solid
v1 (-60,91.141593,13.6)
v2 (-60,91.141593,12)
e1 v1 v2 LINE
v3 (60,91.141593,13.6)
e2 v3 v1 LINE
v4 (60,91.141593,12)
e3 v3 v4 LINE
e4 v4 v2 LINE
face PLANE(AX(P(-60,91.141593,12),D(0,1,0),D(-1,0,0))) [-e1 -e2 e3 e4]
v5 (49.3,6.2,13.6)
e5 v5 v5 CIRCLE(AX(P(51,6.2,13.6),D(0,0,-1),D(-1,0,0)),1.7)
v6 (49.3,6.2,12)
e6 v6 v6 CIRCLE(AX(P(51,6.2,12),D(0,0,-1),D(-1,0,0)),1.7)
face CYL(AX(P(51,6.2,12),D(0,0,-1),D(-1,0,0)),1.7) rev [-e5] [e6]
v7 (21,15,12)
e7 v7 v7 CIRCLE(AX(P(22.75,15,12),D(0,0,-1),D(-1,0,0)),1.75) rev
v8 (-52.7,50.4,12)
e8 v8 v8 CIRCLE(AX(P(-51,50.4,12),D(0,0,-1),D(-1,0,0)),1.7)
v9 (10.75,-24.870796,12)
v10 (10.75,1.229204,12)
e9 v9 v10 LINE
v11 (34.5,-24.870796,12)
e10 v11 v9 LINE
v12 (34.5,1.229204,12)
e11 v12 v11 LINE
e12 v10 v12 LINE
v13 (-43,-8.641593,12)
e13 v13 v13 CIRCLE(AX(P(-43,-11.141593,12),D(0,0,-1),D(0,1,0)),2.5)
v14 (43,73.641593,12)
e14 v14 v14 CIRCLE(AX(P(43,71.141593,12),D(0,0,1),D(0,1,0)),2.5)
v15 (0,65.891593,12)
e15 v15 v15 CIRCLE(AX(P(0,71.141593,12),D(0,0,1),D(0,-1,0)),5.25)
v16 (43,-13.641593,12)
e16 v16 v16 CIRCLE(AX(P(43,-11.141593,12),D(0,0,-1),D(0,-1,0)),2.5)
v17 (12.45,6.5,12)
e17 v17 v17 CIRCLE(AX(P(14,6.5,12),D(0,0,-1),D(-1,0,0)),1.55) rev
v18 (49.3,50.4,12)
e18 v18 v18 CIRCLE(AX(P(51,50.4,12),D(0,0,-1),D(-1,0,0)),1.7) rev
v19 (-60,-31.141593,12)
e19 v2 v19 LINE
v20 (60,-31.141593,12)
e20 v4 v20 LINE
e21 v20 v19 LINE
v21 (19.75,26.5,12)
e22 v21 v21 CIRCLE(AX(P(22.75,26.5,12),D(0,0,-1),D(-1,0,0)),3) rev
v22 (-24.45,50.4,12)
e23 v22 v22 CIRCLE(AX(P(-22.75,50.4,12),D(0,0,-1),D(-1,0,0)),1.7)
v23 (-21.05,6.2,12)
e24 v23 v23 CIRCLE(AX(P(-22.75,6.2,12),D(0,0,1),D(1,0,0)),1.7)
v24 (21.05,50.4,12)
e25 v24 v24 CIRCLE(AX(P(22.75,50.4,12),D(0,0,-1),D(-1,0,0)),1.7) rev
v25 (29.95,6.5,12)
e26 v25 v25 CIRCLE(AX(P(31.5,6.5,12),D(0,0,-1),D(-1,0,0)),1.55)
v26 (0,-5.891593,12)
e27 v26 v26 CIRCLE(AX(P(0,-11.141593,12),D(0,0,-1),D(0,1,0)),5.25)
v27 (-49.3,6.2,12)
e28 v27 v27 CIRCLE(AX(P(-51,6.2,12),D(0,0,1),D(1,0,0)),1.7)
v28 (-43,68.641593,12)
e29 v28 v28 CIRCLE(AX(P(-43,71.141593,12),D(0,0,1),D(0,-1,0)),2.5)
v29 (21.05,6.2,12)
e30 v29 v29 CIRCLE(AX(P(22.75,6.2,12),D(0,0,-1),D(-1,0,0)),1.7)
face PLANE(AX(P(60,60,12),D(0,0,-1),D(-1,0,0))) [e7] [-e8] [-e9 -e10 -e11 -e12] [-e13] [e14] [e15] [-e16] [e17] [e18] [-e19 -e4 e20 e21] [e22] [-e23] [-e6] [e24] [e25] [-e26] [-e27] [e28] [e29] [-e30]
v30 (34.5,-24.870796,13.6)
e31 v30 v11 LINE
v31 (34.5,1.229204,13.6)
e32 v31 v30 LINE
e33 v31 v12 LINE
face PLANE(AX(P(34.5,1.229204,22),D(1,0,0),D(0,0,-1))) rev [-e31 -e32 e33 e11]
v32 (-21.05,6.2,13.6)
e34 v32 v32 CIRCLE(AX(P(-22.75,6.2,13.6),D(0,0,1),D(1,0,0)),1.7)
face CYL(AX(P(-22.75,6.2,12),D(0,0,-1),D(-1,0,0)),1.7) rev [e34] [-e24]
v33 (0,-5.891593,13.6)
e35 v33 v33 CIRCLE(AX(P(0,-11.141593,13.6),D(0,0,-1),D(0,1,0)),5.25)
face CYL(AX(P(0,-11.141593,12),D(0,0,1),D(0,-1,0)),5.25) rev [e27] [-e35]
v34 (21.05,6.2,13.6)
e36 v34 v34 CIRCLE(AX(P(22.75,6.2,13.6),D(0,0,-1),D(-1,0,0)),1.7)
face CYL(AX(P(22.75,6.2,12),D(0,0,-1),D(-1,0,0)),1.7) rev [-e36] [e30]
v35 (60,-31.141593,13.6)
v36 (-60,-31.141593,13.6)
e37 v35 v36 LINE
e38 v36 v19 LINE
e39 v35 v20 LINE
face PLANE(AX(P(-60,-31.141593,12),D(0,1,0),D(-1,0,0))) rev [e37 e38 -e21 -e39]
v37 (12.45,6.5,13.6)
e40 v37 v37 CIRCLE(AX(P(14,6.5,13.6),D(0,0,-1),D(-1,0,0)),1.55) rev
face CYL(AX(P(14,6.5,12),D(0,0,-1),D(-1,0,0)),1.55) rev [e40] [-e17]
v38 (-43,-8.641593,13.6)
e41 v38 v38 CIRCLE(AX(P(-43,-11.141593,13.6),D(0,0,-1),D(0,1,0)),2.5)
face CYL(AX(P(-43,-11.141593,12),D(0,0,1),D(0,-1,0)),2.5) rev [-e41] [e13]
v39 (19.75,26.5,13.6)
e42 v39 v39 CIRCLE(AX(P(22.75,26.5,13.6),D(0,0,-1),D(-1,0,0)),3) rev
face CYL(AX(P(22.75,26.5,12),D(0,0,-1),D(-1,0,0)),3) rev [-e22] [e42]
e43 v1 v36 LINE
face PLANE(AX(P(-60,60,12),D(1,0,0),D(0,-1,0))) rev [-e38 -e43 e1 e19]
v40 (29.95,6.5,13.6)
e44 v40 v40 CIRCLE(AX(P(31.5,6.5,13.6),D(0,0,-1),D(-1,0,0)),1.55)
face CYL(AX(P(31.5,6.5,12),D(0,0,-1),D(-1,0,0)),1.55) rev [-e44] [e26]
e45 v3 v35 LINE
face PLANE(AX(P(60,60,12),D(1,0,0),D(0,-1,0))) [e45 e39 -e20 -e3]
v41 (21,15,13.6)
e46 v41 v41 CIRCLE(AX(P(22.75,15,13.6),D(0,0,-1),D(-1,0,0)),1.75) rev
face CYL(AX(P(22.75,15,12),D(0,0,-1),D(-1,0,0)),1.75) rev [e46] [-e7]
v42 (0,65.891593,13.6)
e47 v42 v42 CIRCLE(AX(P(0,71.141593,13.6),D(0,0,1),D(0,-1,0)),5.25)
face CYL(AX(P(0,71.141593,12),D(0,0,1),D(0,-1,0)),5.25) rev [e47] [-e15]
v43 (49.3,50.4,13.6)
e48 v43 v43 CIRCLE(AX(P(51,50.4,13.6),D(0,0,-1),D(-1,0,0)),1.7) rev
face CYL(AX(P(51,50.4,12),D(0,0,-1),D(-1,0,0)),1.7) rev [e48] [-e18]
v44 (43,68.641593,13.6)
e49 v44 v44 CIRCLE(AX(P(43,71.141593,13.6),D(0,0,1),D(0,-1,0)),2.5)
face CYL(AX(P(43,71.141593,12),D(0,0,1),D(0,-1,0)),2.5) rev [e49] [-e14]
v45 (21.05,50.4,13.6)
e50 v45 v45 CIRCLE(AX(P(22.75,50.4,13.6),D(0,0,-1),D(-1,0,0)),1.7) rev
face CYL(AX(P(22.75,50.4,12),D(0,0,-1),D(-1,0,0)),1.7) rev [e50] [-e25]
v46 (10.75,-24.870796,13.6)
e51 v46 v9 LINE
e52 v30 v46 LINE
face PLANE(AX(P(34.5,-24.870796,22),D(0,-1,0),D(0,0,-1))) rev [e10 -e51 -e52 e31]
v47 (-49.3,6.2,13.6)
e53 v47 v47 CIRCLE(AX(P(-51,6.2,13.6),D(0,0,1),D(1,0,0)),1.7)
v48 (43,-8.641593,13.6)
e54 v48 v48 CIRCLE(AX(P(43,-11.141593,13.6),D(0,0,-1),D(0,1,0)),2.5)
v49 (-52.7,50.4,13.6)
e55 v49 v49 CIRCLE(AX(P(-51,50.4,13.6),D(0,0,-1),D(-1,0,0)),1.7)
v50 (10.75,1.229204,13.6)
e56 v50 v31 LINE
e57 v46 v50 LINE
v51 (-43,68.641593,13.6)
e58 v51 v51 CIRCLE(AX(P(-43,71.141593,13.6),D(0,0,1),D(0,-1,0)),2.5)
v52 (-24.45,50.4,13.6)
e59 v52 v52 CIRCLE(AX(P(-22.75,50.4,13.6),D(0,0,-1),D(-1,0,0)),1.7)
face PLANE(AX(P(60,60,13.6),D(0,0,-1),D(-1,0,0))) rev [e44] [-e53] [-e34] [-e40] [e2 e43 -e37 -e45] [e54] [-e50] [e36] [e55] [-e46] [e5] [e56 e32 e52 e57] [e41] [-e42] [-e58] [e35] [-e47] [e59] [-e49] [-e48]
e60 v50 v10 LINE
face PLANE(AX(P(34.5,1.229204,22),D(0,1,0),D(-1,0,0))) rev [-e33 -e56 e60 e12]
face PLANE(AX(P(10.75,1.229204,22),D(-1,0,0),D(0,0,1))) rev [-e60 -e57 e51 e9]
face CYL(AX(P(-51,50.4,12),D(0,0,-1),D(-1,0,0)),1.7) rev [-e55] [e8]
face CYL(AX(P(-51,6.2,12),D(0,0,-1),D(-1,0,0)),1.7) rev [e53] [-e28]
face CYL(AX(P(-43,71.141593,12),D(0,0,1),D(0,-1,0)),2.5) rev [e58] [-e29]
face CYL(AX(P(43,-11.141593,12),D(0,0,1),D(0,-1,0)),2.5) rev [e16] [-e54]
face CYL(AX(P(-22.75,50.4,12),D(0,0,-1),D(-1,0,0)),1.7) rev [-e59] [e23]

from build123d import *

# Parameters (mm, degrees)
SKETCH1_R                  = 5.25
SKETCH1_R_2                = 2.5
BOSS_EXTRUDE1_DEPTH        = 1.6
SKETCH3_W                  = 120
SKETCH3_H                  = 1.6
BOSS_EXTRUDE3_DEPTH        = 60
SKETCH4_R                  = 3
SKETCH4_R_2                = 1.55
SKETCH4_R_3                = 1.75
CUT_EXTRUDE1_DEPTH         = 10
SKETCH6_R                  = 1.7
CUT_EXTRUDE2_DEPTH         = 25
CONVERT_SOLID1_START       = -61
CONVERT_SOLID1_DEPTH       = 122
CONVERT_SOLID1_START_2     = -60
CONVERT_SOLID1_2_DEPTH     = 120
CUT_EXTRUDE3_OUTLINE_W     = 120
CUT_EXTRUDE3_OUTLINE_H     = 60
CUT_EXTRUDE3_OUTLINE_R     = 1.7
CUT_EXTRUDE3_OUTLINE_R_2   = 1.55
CUT_EXTRUDE3_OUTLINE_R_3   = 1.75
CUT_EXTRUDE3_OUTLINE_R_4   = 3
CUT_EXTRUDE3_DEPTH         = 32
CUT_EXTRUDE3_START         = -1.6
CUT_EXTRUDE3_2_OUTLINE_W   = 23.75
CUT_EXTRUDE3_2_OUTLINE_H   = 1.229203673
CUT_EXTRUDE3_2_DEPTH       = 1.6
CUT_EXTRUDE3_3_OUTLINE_W   = 120
CUT_EXTRUDE3_3_OUTLINE_H   = 122.283185308
CUT_EXTRUDE3_3_OUTLINE_W_2 = 23.75
CUT_EXTRUDE3_3_OUTLINE_H_2 = 26.1
CUT_EXTRUDE3_3_OUTLINE_R   = 2.5
CUT_EXTRUDE3_3_OUTLINE_R_2 = 5.25
CUT_EXTRUDE3_3_OUTLINE_R_3 = 1.7
CUT_EXTRUDE3_3_OUTLINE_R_4 = 1.55
CUT_EXTRUDE3_3_OUTLINE_R_5 = 1.75
CUT_EXTRUDE3_3_OUTLINE_R_6 = 3
CUT_EXTRUDE3_3_DEPTH       = 1.6


with BuildPart() as part:
    # Sketch1 → Boss-Extrude1 (new body)
    with BuildSketch(Plane(origin=(0, 0, 0), x_dir=(1, 0, 0), z_dir=(0, 1, 0))):
        Polygon((-60, -12), (-60, 20), (60, 20), (60, -12), (34.5, -12), (11, -12), align=None)
        with Locations(Location((0, 0, 0), (0, 0, 270))):
            Circle(SKETCH1_R, mode=Mode.SUBTRACT)
        with Locations(Location((-43, 0, 0), (0, 0, 270))):
            Circle(SKETCH1_R_2, mode=Mode.SUBTRACT)
        with Locations(Location((43, 0, 0), (0, 0, 90))):
            Circle(SKETCH1_R_2, mode=Mode.SUBTRACT)
    boss_extrude1 = extrude(amount=BOSS_EXTRUDE1_DEPTH)

    # Sketch3 → Boss-Extrude3 (add)
    with BuildSketch(Plane.XZ):
        with Locations((0, 12.8)):
            Rectangle(SKETCH3_W, SKETCH3_H)
    extrude(amount=-BOSS_EXTRUDE3_DEPTH)

    # Mirror1: Boss-Extrude1 across plane
    add(boss_extrude1.mirror(Plane.ZX.offset(30)))

    # Sketch4 → Cut-Extrude1 (cut)
    with BuildSketch(Plane.XY.offset(12)):
        with Locations(Location((22.75, 26.5, 0), (0, 0, 180))):
            Circle(SKETCH4_R)
        with Locations(Location((31.5, 6.5, 0), (0, 0, 180))):
            Circle(SKETCH4_R_2)
        with Locations(Location((14, 6.5, 0), (0, 0, 180))):
            Circle(SKETCH4_R_2)
        with Locations(Location((22.75, 15, 0), (0, 0, 180))):
            Circle(SKETCH4_R_3)
    extrude(amount=CUT_EXTRUDE1_DEPTH, mode=Mode.SUBTRACT)

    # Sketch6 → Cut-Extrude2 (cut)
    with BuildSketch(Plane(origin=(124.244525073, 40.7, 12), x_dir=(1, 0, 0), z_dir=(0, 0, 1))):
        with Locations(Location((-175.244525073, 9.7, 0), (0, 0, 180))):
            Circle(SKETCH6_R)
        with Locations(Location((-146.994525073, 9.7, 0), (0, 0, 180))):
            Circle(SKETCH6_R)
        with Locations(Location((-101.494525073, 9.7, 0), (0, 0, 180))):
            Circle(SKETCH6_R)
        with Locations(Location((-73.244525073, 9.7, 0), (0, 0, 180))):
            Circle(SKETCH6_R)
        with Locations((-175.244525073, -34.5)):
            Circle(SKETCH6_R)
        with Locations((-146.994525073, -34.5)):
            Circle(SKETCH6_R)
        with Locations(Location((-101.494525073, -34.5, 0), (0, 0, 180))):
            Circle(SKETCH6_R)
        with Locations(Location((-73.244525073, -34.5, 0), (0, 0, 180))):
            Circle(SKETCH6_R)
    extrude(amount=CUT_EXTRUDE2_DEPTH, mode=Mode.SUBTRACT)

    # Convert-Solid1: read off the stored shape, not the designer's step
    # Convert-Solid1 outline → Convert-Solid1 (cut)
    with BuildSketch(Plane.YZ.offset(CONVERT_SOLID1_START)):
        with BuildLine():
            Line((60, 13.6), (57.2, 13.6))
            ThreePointArc((57.2, 13.6), (59.179898987, 12.779898987), (60, 10.8))
            Line((60, 10.8), (60, 13.6))
        make_face()
        with BuildLine():
            ThreePointArc((0, 10.8), (0.820101013, 12.779898987), (2.8, 13.6))
            Line((2.8, 13.6), (0, 13.6))
            Line((0, 13.6), (0, 10.8))
        make_face()
    extrude(amount=CONVERT_SOLID1_DEPTH, mode=Mode.SUBTRACT)

    # Convert-Solid1 2 outline → Convert-Solid1 2 (add)
    with BuildSketch(Plane.YZ.offset(CONVERT_SOLID1_START_2)):
        with BuildLine():
            Line((58.4, 12), (57.2, 12))
            ThreePointArc((57.2, 12), (58.048528137, 11.648528137), (58.4, 10.8))
            Line((58.4, 10.8), (58.4, 12))
        make_face()
        with BuildLine():
            ThreePointArc((1.6, 10.8), (1.951471863, 11.648528137), (2.8, 12))
            Line((2.8, 12), (1.6, 12))
            Line((1.6, 12), (1.6, 10.8))
        make_face()
    extrude(amount=CONVERT_SOLID1_2_DEPTH)

    # Cut-Extrude3: read off the stored shape, not the designer's step
    # Cut-Extrude3 outline → Cut-Extrude3 (cut)
    with BuildSketch(Plane(origin=(0, 0, 12), x_dir=(-1, 0, 0), z_dir=(0, 0, -1))):
        with Locations((0, 30)):
            Rectangle(CUT_EXTRUDE3_OUTLINE_W, CUT_EXTRUDE3_OUTLINE_H)
        with Locations((51, 50.4)):
            Circle(CUT_EXTRUDE3_OUTLINE_R, mode=Mode.SUBTRACT)
        with Locations((-51, 6.2)):
            Circle(CUT_EXTRUDE3_OUTLINE_R, mode=Mode.SUBTRACT)
        with Locations((-31.5, 6.5)):
            Circle(CUT_EXTRUDE3_OUTLINE_R_2, mode=Mode.SUBTRACT)
        with Locations((-22.75, 6.2)):
            Circle(CUT_EXTRUDE3_OUTLINE_R, mode=Mode.SUBTRACT)
        with Locations((-14, 6.5)):
            Circle(CUT_EXTRUDE3_OUTLINE_R_2, mode=Mode.SUBTRACT)
        with Locations((-22.75, 15)):
            Circle(CUT_EXTRUDE3_OUTLINE_R_3, mode=Mode.SUBTRACT)
        with Locations((-22.75, 26.5)):
            Circle(CUT_EXTRUDE3_OUTLINE_R_4, mode=Mode.SUBTRACT)
        with Locations((22.75, 6.2)):
            Circle(CUT_EXTRUDE3_OUTLINE_R, mode=Mode.SUBTRACT)
        with Locations((51, 6.2)):
            Circle(CUT_EXTRUDE3_OUTLINE_R, mode=Mode.SUBTRACT)
        with Locations((-51, 50.4)):
            Circle(CUT_EXTRUDE3_OUTLINE_R, mode=Mode.SUBTRACT)
        with Locations((-22.75, 50.4)):
            Circle(CUT_EXTRUDE3_OUTLINE_R, mode=Mode.SUBTRACT)
        with Locations((22.75, 50.4)):
            Circle(CUT_EXTRUDE3_OUTLINE_R, mode=Mode.SUBTRACT)
    extrude(amount=CUT_EXTRUDE3_DEPTH, mode=Mode.SUBTRACT)

    # Cut-Extrude3 2 outline → Cut-Extrude3 2 (cut)
    with BuildSketch(Plane(origin=(0, 0, 12), x_dir=(-1, 0, 0), z_dir=(0, 0, -1)).offset(CUT_EXTRUDE3_START)):
        with Locations((-22.625, 0.614601836)):
            Rectangle(CUT_EXTRUDE3_2_OUTLINE_W, CUT_EXTRUDE3_2_OUTLINE_H)
    extrude(amount=CUT_EXTRUDE3_2_DEPTH, mode=Mode.SUBTRACT)

    # Cut-Extrude3 3 outline → Cut-Extrude3 3 (add)
    with BuildSketch(Plane(origin=(0, 0, 12), x_dir=(-1, 0, 0), z_dir=(0, 0, -1)).offset(CUT_EXTRUDE3_START)):
        with Locations((0, 30)):
            Rectangle(CUT_EXTRUDE3_3_OUTLINE_W, CUT_EXTRUDE3_3_OUTLINE_H)
        with Locations((-22.625, -11.820796327)):
            Rectangle(CUT_EXTRUDE3_3_OUTLINE_W_2, CUT_EXTRUDE3_3_OUTLINE_H_2, mode=Mode.SUBTRACT)
        with Locations((-43, -11.141592654)):
            Circle(CUT_EXTRUDE3_3_OUTLINE_R, mode=Mode.SUBTRACT)
        with Locations((0, -11.141592654)):
            Circle(CUT_EXTRUDE3_3_OUTLINE_R_2, mode=Mode.SUBTRACT)
        with Locations((43, -11.141592654)):
            Circle(CUT_EXTRUDE3_3_OUTLINE_R, mode=Mode.SUBTRACT)
        with Locations((51, 50.4)):
            Circle(CUT_EXTRUDE3_3_OUTLINE_R_3, mode=Mode.SUBTRACT)
        with Locations((-51, 6.2)):
            Circle(CUT_EXTRUDE3_3_OUTLINE_R_3, mode=Mode.SUBTRACT)
        with Locations((-31.5, 6.5)):
            Circle(CUT_EXTRUDE3_3_OUTLINE_R_4, mode=Mode.SUBTRACT)
        with Locations((-22.75, 6.2)):
            Circle(CUT_EXTRUDE3_3_OUTLINE_R_3, mode=Mode.SUBTRACT)
        with Locations((-14, 6.5)):
            Circle(CUT_EXTRUDE3_3_OUTLINE_R_4, mode=Mode.SUBTRACT)
        with Locations((-22.75, 15)):
            Circle(CUT_EXTRUDE3_3_OUTLINE_R_5, mode=Mode.SUBTRACT)
        with Locations((-22.75, 26.5)):
            Circle(CUT_EXTRUDE3_3_OUTLINE_R_6, mode=Mode.SUBTRACT)
        with Locations((22.75, 6.2)):
            Circle(CUT_EXTRUDE3_3_OUTLINE_R_3, mode=Mode.SUBTRACT)
        with Locations((51, 6.2)):
            Circle(CUT_EXTRUDE3_3_OUTLINE_R_3, mode=Mode.SUBTRACT)
        with Locations((-51, 50.4)):
            Circle(CUT_EXTRUDE3_3_OUTLINE_R_3, mode=Mode.SUBTRACT)
        with Locations((-22.75, 50.4)):
            Circle(CUT_EXTRUDE3_3_OUTLINE_R_3, mode=Mode.SUBTRACT)
        with Locations((22.75, 50.4)):
            Circle(CUT_EXTRUDE3_3_OUTLINE_R_3, mode=Mode.SUBTRACT)
        with Locations((43, 71.141592654)):
            Circle(CUT_EXTRUDE3_3_OUTLINE_R, mode=Mode.SUBTRACT)
        with Locations((-43, 71.141592654)):
            Circle(CUT_EXTRUDE3_3_OUTLINE_R, mode=Mode.SUBTRACT)
        with Locations((0, 71.141592654)):
            Circle(CUT_EXTRUDE3_3_OUTLINE_R_2, mode=Mode.SUBTRACT)
    extrude(amount=CUT_EXTRUDE3_3_DEPTH)


solid = part.part
